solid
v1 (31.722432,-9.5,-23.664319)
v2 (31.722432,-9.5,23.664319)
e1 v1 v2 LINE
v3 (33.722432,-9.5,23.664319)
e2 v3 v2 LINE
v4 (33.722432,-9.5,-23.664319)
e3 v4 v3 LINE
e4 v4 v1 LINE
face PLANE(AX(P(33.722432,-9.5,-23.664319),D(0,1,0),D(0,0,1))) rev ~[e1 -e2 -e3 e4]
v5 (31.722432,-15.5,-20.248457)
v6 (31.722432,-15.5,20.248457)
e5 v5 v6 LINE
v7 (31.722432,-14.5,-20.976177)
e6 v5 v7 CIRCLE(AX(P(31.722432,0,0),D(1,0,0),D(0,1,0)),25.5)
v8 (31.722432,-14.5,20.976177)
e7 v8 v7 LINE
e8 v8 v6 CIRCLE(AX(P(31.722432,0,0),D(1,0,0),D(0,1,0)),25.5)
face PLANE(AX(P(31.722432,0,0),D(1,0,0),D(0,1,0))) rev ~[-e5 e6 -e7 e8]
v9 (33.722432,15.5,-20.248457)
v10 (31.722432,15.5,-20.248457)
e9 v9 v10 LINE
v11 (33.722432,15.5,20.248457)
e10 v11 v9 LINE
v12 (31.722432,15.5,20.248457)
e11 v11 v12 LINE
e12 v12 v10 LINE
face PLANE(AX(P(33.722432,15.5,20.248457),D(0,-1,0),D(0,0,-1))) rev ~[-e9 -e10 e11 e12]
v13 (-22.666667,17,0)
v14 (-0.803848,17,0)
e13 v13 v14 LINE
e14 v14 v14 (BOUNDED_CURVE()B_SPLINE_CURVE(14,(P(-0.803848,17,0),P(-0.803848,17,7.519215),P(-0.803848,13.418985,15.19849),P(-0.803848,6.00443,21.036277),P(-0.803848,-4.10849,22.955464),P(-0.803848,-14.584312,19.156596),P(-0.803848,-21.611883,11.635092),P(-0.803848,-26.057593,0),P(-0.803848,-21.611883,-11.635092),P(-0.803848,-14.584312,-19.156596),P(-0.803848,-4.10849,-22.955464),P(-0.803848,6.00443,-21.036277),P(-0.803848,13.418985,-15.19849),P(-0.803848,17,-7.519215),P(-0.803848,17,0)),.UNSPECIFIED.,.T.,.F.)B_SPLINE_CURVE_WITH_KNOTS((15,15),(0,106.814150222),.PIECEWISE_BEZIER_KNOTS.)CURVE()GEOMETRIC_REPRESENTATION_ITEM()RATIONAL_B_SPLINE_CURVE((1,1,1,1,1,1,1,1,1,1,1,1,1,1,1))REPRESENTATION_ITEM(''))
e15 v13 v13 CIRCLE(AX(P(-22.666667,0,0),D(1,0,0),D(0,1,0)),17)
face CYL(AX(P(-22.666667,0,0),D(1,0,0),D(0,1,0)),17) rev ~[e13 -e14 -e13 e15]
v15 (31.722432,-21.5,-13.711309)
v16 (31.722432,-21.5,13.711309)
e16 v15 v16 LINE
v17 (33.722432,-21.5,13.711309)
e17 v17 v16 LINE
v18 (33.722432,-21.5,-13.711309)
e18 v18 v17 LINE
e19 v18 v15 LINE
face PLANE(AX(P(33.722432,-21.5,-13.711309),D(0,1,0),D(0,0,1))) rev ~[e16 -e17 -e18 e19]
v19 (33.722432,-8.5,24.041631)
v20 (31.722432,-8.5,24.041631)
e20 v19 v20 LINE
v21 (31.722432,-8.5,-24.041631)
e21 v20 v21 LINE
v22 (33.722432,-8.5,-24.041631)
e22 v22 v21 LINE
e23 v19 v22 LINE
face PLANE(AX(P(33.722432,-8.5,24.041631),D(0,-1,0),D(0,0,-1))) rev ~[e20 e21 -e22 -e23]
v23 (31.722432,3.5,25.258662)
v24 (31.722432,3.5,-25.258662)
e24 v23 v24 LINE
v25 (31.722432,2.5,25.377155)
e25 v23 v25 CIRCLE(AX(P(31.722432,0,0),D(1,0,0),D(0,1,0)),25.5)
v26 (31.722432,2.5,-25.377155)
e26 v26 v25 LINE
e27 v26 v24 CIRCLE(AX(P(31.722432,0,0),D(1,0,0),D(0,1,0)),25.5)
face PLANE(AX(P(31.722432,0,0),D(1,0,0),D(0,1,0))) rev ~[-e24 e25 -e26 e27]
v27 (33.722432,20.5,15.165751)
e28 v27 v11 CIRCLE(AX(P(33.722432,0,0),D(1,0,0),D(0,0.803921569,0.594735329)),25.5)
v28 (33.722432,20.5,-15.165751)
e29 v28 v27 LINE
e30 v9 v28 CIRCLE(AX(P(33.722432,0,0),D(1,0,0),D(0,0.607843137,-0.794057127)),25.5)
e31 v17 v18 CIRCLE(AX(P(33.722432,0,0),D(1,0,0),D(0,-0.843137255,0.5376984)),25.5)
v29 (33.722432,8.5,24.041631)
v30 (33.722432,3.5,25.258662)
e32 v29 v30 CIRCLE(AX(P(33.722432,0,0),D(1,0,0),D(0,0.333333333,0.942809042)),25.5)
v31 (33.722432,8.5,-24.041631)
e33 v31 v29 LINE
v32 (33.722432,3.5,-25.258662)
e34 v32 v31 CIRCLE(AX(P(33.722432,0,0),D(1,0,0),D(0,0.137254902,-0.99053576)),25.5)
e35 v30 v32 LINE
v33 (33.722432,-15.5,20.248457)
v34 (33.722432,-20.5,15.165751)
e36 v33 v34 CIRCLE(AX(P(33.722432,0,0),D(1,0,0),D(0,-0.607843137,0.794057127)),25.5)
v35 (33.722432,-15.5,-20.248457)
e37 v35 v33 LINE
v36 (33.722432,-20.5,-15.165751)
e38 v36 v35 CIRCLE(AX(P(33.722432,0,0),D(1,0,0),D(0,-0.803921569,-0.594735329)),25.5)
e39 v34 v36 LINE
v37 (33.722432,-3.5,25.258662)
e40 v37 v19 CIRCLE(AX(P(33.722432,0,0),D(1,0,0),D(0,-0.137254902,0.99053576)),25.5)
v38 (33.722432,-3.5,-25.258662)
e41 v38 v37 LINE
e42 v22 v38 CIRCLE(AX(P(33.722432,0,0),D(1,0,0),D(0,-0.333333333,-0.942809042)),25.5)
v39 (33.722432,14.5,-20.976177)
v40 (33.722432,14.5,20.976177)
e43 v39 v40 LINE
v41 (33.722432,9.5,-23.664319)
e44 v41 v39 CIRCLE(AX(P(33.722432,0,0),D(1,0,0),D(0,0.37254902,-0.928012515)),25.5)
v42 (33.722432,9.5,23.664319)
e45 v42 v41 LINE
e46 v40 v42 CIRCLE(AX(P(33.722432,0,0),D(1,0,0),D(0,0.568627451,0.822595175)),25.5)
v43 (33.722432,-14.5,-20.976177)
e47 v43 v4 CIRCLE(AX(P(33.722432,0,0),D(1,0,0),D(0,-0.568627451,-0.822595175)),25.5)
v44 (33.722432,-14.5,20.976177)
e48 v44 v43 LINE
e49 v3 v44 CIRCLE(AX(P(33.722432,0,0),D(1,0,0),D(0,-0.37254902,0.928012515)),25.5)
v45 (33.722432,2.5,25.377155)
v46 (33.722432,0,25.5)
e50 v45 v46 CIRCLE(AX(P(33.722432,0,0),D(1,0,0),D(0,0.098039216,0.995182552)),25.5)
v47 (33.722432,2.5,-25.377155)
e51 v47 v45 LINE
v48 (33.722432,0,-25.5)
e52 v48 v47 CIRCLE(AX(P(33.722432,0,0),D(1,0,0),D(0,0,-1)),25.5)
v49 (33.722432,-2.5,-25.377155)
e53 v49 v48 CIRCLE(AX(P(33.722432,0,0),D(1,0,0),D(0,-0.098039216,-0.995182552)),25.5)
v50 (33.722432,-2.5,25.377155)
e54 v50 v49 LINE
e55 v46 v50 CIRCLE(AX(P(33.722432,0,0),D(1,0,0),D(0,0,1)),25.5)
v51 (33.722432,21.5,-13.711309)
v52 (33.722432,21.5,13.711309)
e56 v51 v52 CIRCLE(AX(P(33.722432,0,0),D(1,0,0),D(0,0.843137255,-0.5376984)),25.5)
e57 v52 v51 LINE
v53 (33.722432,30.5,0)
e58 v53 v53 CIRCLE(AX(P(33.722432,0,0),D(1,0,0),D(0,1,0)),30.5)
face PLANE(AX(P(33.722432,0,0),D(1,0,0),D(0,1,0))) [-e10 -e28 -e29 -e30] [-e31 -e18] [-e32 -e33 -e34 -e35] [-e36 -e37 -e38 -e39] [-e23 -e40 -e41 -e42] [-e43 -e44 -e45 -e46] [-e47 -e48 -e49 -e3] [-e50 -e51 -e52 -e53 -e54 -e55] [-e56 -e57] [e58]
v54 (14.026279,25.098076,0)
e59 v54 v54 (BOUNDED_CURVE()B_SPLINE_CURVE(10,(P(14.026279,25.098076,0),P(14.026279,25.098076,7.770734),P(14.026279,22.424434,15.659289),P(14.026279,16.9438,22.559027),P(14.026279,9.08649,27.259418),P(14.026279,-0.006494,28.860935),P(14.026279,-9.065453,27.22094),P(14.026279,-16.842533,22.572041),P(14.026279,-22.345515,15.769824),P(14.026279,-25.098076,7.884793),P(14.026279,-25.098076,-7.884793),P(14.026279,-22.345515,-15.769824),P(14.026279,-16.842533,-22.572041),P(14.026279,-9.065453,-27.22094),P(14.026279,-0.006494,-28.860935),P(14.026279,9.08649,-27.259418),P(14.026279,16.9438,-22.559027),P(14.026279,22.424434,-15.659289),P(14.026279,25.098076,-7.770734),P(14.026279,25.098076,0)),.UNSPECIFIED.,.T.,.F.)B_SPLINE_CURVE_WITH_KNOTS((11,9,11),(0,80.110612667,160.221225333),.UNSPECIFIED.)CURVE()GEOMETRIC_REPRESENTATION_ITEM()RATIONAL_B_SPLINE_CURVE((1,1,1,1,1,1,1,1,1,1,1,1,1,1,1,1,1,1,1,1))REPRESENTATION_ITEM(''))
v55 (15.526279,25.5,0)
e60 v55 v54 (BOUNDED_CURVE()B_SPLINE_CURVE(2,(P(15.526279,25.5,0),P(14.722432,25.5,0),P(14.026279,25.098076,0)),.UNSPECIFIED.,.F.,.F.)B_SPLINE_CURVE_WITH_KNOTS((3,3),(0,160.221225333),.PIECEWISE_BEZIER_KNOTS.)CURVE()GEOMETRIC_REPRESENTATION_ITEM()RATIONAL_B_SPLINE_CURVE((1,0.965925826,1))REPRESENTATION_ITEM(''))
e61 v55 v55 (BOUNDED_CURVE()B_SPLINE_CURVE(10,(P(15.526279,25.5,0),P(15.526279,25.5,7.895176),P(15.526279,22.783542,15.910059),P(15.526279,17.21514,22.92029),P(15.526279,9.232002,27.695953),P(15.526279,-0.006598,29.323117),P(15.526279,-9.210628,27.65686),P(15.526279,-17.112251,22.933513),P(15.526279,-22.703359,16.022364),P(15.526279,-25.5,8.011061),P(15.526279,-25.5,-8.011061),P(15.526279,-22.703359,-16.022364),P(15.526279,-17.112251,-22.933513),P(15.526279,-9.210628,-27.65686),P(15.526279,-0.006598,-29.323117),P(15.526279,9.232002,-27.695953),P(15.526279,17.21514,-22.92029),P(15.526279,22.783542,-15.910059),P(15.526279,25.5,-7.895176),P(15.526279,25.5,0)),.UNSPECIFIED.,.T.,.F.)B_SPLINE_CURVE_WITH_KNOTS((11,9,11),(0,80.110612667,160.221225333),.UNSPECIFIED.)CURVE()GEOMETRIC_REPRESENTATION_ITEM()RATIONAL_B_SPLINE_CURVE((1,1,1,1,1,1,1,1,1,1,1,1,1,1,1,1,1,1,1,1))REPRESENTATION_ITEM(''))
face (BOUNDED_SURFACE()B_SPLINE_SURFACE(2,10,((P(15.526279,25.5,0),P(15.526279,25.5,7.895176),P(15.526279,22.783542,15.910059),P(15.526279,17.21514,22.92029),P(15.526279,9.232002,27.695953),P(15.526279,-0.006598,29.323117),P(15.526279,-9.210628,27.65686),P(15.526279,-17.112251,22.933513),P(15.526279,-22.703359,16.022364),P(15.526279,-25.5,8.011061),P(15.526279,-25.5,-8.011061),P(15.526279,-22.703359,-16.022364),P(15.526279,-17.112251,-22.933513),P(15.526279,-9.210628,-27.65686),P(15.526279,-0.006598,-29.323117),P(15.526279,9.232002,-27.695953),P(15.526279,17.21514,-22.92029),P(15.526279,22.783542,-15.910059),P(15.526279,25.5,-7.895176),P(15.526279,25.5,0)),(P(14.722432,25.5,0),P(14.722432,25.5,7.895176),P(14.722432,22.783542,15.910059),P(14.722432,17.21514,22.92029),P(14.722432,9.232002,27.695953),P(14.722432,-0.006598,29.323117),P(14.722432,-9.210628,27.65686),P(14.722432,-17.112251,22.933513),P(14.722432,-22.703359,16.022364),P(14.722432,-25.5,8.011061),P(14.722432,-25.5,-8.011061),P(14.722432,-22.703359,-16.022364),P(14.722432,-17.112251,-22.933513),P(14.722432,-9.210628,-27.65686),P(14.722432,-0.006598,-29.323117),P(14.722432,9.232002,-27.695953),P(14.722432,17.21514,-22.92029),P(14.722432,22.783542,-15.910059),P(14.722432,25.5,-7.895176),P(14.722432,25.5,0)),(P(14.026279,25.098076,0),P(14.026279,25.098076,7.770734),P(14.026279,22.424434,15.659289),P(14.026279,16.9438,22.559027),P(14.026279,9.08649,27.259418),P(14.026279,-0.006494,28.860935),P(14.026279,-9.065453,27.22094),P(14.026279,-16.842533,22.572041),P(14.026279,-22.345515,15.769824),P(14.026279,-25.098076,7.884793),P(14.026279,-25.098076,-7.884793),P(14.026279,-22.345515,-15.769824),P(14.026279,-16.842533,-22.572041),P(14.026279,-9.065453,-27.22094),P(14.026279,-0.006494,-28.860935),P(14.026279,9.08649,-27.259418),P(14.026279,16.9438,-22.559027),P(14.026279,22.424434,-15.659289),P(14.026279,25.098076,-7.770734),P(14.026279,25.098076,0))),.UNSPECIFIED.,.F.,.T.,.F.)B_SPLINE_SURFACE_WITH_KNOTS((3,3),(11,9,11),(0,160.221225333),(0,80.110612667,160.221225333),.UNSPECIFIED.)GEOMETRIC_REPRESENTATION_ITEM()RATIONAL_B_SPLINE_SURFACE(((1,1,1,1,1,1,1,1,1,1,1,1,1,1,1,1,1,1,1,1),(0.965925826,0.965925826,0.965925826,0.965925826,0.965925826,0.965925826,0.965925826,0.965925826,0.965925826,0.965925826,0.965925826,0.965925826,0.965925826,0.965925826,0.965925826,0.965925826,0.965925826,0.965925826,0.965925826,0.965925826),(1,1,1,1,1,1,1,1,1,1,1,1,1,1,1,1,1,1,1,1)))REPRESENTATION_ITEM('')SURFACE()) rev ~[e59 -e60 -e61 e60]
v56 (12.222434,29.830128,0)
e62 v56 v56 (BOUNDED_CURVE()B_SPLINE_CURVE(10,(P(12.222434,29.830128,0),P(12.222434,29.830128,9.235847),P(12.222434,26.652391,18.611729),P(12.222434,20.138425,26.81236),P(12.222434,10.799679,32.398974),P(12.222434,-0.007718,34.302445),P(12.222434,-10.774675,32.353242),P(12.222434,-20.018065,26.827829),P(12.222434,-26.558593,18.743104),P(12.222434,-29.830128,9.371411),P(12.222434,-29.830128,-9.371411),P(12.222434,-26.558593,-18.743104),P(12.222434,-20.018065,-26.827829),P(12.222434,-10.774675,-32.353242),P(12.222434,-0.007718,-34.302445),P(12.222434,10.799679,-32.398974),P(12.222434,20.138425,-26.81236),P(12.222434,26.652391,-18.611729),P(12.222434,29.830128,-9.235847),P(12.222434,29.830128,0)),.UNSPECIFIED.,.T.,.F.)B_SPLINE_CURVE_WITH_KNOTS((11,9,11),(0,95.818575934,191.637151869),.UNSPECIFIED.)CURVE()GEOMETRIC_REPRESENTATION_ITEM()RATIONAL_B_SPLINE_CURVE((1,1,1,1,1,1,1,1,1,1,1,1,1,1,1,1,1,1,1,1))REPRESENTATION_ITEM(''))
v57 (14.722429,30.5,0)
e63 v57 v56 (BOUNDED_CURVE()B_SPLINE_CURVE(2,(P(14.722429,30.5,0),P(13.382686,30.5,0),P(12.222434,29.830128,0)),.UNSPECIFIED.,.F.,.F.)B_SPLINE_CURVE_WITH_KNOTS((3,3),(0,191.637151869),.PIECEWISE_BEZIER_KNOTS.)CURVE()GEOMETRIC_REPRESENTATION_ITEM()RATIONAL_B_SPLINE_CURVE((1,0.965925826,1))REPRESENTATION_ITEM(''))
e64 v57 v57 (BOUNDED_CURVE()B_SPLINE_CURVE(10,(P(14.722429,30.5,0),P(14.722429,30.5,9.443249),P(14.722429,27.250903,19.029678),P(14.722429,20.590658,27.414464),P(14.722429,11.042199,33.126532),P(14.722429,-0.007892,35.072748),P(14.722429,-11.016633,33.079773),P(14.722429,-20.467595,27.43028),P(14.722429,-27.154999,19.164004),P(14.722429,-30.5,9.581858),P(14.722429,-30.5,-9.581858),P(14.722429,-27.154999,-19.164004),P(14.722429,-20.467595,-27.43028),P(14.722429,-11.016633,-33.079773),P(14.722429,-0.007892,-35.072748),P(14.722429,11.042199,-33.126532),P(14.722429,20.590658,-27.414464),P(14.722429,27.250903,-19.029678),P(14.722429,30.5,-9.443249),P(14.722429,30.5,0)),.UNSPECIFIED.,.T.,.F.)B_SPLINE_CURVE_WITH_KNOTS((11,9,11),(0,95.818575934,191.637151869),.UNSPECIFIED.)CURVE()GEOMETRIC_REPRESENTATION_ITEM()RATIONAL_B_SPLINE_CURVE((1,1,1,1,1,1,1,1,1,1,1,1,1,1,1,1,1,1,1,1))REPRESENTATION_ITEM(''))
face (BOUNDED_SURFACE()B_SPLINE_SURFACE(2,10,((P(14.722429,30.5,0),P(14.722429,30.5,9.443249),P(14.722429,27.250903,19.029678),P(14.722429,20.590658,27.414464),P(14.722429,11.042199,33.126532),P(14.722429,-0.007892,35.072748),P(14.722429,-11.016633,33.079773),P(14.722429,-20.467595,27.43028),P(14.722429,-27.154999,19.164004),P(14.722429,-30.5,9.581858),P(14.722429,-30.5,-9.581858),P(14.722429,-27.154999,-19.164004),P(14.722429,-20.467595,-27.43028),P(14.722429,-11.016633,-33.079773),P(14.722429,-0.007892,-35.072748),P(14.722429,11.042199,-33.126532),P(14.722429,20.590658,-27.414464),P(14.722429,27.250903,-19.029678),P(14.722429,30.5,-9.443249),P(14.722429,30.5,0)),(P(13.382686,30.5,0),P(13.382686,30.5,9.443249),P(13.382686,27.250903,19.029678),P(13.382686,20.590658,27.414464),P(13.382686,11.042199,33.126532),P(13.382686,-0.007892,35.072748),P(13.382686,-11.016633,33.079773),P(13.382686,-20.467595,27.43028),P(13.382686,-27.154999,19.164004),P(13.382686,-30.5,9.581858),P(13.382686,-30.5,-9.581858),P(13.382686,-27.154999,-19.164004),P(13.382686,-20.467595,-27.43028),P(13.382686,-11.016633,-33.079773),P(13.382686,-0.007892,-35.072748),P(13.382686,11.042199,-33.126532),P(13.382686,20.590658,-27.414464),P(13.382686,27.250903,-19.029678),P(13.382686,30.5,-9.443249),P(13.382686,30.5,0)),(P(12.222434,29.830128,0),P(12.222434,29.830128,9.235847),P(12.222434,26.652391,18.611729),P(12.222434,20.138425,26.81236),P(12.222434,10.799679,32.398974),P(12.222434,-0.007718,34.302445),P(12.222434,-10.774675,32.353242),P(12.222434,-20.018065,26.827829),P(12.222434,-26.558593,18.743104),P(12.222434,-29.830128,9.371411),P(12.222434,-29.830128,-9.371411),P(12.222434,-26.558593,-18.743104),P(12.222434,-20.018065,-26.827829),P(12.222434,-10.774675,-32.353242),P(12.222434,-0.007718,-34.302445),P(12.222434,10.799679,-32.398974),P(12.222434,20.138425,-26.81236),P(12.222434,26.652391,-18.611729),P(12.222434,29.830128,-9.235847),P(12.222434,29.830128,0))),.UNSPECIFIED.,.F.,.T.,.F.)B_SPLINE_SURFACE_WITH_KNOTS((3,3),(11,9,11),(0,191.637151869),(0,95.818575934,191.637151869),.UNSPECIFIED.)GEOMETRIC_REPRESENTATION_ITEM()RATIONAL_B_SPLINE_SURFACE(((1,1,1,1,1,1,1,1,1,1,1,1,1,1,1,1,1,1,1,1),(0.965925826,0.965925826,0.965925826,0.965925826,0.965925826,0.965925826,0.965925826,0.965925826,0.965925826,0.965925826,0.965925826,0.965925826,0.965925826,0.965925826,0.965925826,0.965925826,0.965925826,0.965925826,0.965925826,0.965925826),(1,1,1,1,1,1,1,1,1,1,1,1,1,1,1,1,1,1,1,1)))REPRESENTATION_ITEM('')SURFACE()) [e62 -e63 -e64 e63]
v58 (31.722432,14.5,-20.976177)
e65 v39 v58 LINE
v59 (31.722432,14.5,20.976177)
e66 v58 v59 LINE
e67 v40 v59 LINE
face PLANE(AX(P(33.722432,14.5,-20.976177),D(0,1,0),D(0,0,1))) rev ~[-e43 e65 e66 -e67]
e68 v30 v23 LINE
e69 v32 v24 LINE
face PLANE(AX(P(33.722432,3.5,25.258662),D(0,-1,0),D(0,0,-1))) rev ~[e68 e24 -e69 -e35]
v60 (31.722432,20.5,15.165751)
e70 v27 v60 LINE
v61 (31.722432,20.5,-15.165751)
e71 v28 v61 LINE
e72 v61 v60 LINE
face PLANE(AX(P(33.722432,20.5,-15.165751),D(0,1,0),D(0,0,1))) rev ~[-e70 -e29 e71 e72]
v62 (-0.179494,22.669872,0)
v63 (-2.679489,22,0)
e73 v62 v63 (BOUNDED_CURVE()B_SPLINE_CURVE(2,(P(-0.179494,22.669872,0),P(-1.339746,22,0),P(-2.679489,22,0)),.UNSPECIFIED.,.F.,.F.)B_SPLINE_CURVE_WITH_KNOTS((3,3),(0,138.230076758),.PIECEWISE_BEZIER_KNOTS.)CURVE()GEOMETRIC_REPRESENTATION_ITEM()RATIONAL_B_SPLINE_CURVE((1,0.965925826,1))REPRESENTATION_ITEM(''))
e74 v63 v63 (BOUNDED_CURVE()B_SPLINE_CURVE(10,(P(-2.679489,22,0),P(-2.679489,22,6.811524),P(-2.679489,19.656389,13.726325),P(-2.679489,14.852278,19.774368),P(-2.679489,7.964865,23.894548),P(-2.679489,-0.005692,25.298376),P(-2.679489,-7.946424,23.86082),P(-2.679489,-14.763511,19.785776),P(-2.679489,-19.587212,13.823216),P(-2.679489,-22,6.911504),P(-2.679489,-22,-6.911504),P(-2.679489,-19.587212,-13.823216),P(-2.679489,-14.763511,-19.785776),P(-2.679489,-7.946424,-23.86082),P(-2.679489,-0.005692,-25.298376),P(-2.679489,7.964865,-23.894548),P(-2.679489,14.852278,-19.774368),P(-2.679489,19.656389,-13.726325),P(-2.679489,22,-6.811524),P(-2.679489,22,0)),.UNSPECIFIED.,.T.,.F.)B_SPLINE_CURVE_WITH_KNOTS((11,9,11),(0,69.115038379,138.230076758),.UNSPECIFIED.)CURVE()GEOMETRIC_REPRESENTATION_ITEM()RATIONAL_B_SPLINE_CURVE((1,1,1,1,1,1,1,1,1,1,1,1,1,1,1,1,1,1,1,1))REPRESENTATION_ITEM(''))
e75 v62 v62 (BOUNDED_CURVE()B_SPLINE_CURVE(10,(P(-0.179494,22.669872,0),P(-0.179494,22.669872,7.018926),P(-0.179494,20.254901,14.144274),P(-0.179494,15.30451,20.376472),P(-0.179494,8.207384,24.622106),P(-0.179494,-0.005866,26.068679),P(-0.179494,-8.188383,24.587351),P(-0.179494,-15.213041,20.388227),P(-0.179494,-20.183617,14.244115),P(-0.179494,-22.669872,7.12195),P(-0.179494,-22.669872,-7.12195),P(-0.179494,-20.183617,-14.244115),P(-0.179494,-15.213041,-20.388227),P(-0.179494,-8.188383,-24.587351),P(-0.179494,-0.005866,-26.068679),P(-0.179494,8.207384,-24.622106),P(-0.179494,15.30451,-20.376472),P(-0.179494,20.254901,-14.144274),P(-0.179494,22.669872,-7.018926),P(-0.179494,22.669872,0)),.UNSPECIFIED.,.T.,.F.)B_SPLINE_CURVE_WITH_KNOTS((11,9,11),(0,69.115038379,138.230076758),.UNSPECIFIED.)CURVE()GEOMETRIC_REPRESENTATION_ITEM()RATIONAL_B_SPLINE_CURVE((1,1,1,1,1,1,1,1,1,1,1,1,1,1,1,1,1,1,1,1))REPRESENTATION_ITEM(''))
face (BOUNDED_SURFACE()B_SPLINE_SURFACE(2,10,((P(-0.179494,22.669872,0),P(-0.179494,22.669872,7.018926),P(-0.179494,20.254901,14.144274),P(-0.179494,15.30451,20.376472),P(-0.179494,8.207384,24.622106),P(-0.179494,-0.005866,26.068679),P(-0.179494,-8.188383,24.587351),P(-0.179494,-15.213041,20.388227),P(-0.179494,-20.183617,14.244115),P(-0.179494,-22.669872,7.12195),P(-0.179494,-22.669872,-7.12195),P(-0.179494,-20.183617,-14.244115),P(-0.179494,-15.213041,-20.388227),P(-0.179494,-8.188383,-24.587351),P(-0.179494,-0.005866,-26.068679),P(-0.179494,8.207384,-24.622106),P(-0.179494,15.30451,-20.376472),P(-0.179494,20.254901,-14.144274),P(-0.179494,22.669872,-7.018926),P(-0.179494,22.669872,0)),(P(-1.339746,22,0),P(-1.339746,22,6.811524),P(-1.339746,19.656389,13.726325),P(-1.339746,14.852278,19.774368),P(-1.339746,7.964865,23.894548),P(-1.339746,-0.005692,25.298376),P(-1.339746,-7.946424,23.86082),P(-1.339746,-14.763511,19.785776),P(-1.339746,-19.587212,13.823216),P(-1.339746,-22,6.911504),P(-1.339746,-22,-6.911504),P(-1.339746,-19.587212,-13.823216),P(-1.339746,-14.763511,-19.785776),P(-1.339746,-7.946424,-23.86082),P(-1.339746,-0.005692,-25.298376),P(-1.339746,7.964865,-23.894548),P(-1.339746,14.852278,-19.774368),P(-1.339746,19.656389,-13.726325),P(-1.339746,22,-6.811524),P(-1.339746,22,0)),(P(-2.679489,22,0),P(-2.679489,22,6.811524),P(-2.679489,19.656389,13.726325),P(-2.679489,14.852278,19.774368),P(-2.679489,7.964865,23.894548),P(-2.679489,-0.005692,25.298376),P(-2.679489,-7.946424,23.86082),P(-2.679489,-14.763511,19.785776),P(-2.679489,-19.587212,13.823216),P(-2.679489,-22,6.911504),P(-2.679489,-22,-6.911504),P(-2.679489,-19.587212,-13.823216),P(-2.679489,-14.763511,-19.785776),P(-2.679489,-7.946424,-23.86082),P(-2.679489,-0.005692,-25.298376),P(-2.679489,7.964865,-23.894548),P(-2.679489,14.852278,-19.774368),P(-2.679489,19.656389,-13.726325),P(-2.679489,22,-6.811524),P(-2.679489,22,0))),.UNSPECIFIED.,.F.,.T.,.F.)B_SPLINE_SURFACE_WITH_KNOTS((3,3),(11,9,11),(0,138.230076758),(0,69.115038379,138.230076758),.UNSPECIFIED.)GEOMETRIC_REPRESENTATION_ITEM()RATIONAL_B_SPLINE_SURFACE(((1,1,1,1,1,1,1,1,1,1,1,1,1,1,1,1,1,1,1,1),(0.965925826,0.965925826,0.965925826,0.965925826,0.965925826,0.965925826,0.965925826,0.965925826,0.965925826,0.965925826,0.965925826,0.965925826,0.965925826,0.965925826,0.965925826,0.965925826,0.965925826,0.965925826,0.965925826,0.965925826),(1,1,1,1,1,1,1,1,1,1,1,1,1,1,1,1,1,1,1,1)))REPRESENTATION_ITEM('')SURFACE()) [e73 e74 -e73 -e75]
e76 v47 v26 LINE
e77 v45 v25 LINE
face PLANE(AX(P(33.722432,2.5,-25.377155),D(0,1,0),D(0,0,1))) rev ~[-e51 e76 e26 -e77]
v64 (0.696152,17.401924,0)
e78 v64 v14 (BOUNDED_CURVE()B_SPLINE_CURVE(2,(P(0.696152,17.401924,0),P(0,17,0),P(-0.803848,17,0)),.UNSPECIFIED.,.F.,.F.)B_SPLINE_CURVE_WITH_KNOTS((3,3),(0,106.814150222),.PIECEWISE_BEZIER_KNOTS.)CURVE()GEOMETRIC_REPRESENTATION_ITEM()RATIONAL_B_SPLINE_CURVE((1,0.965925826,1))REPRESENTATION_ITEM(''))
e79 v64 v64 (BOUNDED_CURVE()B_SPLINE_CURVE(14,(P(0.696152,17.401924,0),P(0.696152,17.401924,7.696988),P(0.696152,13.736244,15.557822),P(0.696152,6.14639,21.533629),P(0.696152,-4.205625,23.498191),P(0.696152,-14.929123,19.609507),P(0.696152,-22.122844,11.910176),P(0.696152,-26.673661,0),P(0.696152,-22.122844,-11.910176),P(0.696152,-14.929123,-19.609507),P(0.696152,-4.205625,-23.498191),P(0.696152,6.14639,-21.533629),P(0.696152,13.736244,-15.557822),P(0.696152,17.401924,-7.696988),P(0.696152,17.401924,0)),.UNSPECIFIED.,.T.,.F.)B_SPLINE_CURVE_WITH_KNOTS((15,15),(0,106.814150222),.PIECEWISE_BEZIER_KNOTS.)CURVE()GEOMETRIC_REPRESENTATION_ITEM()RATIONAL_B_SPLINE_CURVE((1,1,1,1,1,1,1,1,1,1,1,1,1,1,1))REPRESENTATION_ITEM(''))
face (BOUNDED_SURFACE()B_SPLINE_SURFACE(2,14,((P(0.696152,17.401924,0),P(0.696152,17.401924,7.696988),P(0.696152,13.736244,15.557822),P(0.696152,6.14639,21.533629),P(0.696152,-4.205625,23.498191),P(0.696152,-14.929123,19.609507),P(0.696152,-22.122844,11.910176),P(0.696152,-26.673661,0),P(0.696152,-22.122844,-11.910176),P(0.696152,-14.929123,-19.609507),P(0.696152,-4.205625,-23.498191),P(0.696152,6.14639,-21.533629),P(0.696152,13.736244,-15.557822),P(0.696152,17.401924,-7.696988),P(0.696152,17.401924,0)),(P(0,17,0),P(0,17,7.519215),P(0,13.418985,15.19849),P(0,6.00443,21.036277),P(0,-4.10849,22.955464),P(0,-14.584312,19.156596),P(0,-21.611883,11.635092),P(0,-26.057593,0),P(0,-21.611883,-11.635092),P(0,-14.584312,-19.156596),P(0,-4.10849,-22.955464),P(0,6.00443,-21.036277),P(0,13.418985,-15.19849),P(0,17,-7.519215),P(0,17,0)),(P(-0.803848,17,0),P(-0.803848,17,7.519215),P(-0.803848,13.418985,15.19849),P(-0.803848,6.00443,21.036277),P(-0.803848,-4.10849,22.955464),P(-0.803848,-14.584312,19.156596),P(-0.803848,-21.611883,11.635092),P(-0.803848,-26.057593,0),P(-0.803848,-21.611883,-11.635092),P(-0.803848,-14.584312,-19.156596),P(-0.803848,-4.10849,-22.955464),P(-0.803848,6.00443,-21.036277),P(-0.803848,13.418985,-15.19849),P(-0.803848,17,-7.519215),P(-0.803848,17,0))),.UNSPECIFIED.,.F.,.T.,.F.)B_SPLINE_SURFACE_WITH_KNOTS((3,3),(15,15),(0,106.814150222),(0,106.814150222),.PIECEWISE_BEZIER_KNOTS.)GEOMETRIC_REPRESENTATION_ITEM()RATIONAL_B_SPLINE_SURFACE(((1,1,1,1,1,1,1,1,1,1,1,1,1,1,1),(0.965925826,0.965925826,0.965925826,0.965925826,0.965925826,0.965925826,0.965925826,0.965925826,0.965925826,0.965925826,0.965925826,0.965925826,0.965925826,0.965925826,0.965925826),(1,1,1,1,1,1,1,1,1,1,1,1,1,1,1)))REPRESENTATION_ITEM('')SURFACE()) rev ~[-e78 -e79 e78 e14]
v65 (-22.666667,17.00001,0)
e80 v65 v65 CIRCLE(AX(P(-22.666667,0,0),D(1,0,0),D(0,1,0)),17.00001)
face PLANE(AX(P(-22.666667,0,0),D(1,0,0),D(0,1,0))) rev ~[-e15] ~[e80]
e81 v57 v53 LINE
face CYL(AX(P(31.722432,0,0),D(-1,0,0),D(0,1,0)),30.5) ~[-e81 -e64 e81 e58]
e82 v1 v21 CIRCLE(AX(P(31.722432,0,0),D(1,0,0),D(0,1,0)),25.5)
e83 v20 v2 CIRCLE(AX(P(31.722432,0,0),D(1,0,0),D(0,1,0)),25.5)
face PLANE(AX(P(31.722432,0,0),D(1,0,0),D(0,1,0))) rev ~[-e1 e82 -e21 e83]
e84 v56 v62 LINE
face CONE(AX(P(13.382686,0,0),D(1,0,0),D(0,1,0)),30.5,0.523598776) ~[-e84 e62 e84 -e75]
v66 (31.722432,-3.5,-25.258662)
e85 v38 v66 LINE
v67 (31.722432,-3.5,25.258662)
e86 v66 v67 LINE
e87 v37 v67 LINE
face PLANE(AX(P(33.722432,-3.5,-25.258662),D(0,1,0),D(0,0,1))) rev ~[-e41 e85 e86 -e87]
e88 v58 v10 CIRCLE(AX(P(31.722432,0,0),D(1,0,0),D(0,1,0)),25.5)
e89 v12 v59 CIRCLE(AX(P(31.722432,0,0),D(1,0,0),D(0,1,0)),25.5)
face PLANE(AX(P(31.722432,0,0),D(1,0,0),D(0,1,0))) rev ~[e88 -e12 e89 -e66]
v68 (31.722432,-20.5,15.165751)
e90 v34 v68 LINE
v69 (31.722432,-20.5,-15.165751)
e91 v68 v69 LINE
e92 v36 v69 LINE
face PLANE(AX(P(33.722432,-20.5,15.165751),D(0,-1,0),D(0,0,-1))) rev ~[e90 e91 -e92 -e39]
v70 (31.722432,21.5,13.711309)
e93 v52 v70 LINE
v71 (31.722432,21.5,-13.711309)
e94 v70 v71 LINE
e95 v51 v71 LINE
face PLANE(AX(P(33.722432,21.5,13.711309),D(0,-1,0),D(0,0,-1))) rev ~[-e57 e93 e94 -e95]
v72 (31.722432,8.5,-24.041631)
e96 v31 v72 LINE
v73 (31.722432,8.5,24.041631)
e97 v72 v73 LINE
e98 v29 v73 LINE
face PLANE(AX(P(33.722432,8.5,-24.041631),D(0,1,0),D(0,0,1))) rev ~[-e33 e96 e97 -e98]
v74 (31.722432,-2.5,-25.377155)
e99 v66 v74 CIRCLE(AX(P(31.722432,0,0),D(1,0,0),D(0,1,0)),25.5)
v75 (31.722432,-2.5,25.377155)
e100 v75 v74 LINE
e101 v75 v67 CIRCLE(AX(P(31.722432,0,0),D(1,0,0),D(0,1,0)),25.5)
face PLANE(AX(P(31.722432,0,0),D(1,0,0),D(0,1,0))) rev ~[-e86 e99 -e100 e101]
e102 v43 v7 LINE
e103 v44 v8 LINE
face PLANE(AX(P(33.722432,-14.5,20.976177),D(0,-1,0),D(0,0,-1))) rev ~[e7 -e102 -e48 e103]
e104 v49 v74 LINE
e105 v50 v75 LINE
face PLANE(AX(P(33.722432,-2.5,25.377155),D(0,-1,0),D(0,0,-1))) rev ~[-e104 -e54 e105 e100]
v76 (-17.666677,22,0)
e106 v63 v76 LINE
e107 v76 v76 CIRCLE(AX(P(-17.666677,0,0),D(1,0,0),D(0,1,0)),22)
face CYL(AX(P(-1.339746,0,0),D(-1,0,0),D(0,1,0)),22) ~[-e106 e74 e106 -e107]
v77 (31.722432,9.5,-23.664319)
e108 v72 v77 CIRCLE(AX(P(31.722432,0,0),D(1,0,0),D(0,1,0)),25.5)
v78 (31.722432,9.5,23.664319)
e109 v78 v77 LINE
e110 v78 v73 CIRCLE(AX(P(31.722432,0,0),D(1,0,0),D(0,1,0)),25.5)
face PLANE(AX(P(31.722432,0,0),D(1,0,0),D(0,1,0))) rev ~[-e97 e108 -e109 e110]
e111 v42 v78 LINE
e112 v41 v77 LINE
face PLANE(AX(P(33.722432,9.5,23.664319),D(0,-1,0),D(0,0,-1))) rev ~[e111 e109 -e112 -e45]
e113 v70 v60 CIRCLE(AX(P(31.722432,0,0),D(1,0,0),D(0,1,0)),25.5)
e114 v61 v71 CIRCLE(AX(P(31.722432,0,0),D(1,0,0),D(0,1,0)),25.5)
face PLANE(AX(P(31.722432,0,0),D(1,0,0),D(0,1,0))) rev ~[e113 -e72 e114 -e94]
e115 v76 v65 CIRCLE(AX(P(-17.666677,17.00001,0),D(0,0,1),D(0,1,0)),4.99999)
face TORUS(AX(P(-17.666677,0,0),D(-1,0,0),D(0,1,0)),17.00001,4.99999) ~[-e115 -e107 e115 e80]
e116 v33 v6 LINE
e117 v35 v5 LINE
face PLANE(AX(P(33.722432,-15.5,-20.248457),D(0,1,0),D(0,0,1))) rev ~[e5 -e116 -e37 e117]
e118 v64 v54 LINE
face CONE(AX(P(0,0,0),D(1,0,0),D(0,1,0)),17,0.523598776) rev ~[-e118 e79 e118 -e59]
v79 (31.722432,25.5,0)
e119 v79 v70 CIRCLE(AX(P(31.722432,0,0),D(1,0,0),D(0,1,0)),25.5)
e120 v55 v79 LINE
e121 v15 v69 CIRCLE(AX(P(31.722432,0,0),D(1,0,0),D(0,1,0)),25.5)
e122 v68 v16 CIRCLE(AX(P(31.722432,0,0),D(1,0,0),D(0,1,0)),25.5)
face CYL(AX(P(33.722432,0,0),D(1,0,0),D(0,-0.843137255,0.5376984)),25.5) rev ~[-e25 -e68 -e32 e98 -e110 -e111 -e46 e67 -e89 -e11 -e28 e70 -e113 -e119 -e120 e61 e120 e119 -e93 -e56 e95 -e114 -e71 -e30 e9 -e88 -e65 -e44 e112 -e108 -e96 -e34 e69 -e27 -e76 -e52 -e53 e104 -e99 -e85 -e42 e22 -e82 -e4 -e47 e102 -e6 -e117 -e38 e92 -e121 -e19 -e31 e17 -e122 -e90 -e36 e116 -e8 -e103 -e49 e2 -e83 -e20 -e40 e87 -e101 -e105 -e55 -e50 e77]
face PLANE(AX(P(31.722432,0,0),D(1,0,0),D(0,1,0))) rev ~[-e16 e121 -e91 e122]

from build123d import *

# Parameters (mm, degrees)
F2_R     = 30.5
F3_DEPTH = 2
F5_DEPTH = 2
F6_R     = 4.99999
F7_R     = 3


# Not quite as in the source:
# - a fillet or chamfer is up to 0.001 mm smaller than in the source, because OpenCascade refuses the exact size
# - a feature names something its author has since deleted; it is built from what else it names


with BuildPart() as f1:
    # F0 (on Top) → F1 (revolve)
    with BuildSketch(Plane.XY):
        Polygon((-22.6666666667, 22), (-22.6666666667, 17), (0, 17), (14.7224318643, 25.5), (31.7224318643, 25.5), (31.7224318643, 30.5), (13.3826859022, 30.5), (-1.3397459622, 22), align=None)
    revolve(axis=Axis((-8.7595172226, 0, 0), (1, 0, 0)))

    # F2 (on face) → F3 (join)
    with BuildSketch(Plane.YZ.offset(31.7224318643)):
        Circle(F2_R)
    extrude(amount=F3_DEPTH)

    # F4 (on face) → F5 (cut, through all)
    with BuildSketch(Plane.YZ.offset(33.7224318643)):
        with BuildLine():
            ThreePointArc((20.5, 15.1657508881), (18.1785168447, 17.8827158264), (15.5, 20.2484567313))
            Line((15.5, 20.2484567313), (15.5, -20.2484567313))
            ThreePointArc((15.5, -20.2484567313), (18.1785168447, -17.8827158264), (20.5, -15.1657508881))
            Line((20.5, -15.1657508881), (20.5, 15.1657508881))
        make_face()
        with BuildLine():
            ThreePointArc((14.5, 20.9761769634), (12.0750373532, 22.4598190758), (9.5, 23.6643191324))
            Line((9.5, 23.6643191324), (9.5, -23.6643191324))
            ThreePointArc((9.5, -23.6643191324), (12.0750373532, -22.4598190758), (14.5, -20.9761769634))
            Line((14.5, -20.9761769634), (14.5, 20.9761769634))
        make_face()
        with BuildLine():
            ThreePointArc((8.5, 24.0416305603), (6.0307786652, 24.7765959868), (3.5, 25.2586618806))
            Line((3.5, 25.2586618806), (3.5, -25.2586618806))
            ThreePointArc((3.5, -25.2586618806), (6.0307786652, -24.7765959868), (8.5, -24.0416305603))
            Line((8.5, -24.0416305603), (8.5, 24.0416305603))
        make_face()
        with BuildLine():
            ThreePointArc((2.5, 25.3771550809), (1.2515081776, 25.4692702542), (0, 25.5))
            ThreePointArc((0, 25.5), (-1.2515081776, 25.4692702542), (-2.5, 25.3771550809))
            Line((-2.5, 25.3771550809), (-2.5, -25.3771550809))
            ThreePointArc((-2.5, -25.3771550809), (-1.2515081776, -25.4692702542), (0, -25.5))
            ThreePointArc((0, -25.5), (1.2515081776, -25.4692702542), (2.5, -25.3771550809))
            Line((2.5, -25.3771550809), (2.5, 25.3771550809))
        make_face()
        with BuildLine():
            Line((-3.5, -25.2586618806), (-3.5, 25.2586618806))
            ThreePointArc((-3.5, 25.2586618806), (-6.0307786652, 24.7765959868), (-8.5, 24.0416305603))
            Line((-8.5, 24.0416305603), (-8.5, -24.0416305603))
            ThreePointArc((-8.5, -24.0416305603), (-6.0307786652, -24.7765959868), (-3.5, -25.2586618806))
        make_face()
        with BuildLine():
            Line((-9.5, -23.6643191324), (-9.5, 23.6643191324))
            ThreePointArc((-9.5, 23.6643191324), (-12.0750373532, 22.4598190758), (-14.5, 20.9761769634))
            Line((-14.5, 20.9761769634), (-14.5, -20.9761769634))
            ThreePointArc((-14.5, -20.9761769634), (-12.0750373532, -22.4598190758), (-9.5, -23.6643191324))
        make_face()
        with BuildLine():
            Line((-15.5, -20.2484567313), (-15.5, 20.2484567313))
            ThreePointArc((-15.5, 20.2484567313), (-18.1785168447, 17.8827158264), (-20.5, 15.1657508881))
            Line((-20.5, 15.1657508881), (-20.5, -15.1657508881))
            ThreePointArc((-20.5, -15.1657508881), (-18.1785168447, -17.8827158264), (-15.5, -20.2484567313))
        make_face()
        with BuildLine():
            Line((-21.5, -13.7113092008), (-21.5, 13.7113092008))
            ThreePointArc((-21.5, 13.7113092008), (-25.5, 0), (-21.5, -13.7113092008))
        make_face()
        with BuildLine():
            ThreePointArc((25.5, 0), (24.4795833298, 7.1414284285), (21.5, 13.7113092008))
            Line((21.5, 13.7113092008), (21.5, -13.7113092008))
            ThreePointArc((21.5, -13.7113092008), (24.4795833298, -7.1414284285), (25.5, 0))
        make_face()
    extrude(amount=-F5_DEPTH, mode=Mode.SUBTRACT)

    # F6 (radius 5 in the source; OpenCascade refuses exactly that, so slightly less here)
    f6_edges = [f1.edges().sort_by_distance(p)[0] for p in [
        (-22.666667, -22, 0),
        (-1.339746, -22, 0),
        (13.382686, -30.5, 0),
    ]]
    fillet(f6_edges, radius=F6_R)

    # F7
    f7_edges = [f1.edges().sort_by_distance(p)[0] for p in [
        (14.722432, -25.5, 0),
        (0, -17, 0),
    ]]
    fillet(f7_edges, radius=F7_R)


solid = f1.part
